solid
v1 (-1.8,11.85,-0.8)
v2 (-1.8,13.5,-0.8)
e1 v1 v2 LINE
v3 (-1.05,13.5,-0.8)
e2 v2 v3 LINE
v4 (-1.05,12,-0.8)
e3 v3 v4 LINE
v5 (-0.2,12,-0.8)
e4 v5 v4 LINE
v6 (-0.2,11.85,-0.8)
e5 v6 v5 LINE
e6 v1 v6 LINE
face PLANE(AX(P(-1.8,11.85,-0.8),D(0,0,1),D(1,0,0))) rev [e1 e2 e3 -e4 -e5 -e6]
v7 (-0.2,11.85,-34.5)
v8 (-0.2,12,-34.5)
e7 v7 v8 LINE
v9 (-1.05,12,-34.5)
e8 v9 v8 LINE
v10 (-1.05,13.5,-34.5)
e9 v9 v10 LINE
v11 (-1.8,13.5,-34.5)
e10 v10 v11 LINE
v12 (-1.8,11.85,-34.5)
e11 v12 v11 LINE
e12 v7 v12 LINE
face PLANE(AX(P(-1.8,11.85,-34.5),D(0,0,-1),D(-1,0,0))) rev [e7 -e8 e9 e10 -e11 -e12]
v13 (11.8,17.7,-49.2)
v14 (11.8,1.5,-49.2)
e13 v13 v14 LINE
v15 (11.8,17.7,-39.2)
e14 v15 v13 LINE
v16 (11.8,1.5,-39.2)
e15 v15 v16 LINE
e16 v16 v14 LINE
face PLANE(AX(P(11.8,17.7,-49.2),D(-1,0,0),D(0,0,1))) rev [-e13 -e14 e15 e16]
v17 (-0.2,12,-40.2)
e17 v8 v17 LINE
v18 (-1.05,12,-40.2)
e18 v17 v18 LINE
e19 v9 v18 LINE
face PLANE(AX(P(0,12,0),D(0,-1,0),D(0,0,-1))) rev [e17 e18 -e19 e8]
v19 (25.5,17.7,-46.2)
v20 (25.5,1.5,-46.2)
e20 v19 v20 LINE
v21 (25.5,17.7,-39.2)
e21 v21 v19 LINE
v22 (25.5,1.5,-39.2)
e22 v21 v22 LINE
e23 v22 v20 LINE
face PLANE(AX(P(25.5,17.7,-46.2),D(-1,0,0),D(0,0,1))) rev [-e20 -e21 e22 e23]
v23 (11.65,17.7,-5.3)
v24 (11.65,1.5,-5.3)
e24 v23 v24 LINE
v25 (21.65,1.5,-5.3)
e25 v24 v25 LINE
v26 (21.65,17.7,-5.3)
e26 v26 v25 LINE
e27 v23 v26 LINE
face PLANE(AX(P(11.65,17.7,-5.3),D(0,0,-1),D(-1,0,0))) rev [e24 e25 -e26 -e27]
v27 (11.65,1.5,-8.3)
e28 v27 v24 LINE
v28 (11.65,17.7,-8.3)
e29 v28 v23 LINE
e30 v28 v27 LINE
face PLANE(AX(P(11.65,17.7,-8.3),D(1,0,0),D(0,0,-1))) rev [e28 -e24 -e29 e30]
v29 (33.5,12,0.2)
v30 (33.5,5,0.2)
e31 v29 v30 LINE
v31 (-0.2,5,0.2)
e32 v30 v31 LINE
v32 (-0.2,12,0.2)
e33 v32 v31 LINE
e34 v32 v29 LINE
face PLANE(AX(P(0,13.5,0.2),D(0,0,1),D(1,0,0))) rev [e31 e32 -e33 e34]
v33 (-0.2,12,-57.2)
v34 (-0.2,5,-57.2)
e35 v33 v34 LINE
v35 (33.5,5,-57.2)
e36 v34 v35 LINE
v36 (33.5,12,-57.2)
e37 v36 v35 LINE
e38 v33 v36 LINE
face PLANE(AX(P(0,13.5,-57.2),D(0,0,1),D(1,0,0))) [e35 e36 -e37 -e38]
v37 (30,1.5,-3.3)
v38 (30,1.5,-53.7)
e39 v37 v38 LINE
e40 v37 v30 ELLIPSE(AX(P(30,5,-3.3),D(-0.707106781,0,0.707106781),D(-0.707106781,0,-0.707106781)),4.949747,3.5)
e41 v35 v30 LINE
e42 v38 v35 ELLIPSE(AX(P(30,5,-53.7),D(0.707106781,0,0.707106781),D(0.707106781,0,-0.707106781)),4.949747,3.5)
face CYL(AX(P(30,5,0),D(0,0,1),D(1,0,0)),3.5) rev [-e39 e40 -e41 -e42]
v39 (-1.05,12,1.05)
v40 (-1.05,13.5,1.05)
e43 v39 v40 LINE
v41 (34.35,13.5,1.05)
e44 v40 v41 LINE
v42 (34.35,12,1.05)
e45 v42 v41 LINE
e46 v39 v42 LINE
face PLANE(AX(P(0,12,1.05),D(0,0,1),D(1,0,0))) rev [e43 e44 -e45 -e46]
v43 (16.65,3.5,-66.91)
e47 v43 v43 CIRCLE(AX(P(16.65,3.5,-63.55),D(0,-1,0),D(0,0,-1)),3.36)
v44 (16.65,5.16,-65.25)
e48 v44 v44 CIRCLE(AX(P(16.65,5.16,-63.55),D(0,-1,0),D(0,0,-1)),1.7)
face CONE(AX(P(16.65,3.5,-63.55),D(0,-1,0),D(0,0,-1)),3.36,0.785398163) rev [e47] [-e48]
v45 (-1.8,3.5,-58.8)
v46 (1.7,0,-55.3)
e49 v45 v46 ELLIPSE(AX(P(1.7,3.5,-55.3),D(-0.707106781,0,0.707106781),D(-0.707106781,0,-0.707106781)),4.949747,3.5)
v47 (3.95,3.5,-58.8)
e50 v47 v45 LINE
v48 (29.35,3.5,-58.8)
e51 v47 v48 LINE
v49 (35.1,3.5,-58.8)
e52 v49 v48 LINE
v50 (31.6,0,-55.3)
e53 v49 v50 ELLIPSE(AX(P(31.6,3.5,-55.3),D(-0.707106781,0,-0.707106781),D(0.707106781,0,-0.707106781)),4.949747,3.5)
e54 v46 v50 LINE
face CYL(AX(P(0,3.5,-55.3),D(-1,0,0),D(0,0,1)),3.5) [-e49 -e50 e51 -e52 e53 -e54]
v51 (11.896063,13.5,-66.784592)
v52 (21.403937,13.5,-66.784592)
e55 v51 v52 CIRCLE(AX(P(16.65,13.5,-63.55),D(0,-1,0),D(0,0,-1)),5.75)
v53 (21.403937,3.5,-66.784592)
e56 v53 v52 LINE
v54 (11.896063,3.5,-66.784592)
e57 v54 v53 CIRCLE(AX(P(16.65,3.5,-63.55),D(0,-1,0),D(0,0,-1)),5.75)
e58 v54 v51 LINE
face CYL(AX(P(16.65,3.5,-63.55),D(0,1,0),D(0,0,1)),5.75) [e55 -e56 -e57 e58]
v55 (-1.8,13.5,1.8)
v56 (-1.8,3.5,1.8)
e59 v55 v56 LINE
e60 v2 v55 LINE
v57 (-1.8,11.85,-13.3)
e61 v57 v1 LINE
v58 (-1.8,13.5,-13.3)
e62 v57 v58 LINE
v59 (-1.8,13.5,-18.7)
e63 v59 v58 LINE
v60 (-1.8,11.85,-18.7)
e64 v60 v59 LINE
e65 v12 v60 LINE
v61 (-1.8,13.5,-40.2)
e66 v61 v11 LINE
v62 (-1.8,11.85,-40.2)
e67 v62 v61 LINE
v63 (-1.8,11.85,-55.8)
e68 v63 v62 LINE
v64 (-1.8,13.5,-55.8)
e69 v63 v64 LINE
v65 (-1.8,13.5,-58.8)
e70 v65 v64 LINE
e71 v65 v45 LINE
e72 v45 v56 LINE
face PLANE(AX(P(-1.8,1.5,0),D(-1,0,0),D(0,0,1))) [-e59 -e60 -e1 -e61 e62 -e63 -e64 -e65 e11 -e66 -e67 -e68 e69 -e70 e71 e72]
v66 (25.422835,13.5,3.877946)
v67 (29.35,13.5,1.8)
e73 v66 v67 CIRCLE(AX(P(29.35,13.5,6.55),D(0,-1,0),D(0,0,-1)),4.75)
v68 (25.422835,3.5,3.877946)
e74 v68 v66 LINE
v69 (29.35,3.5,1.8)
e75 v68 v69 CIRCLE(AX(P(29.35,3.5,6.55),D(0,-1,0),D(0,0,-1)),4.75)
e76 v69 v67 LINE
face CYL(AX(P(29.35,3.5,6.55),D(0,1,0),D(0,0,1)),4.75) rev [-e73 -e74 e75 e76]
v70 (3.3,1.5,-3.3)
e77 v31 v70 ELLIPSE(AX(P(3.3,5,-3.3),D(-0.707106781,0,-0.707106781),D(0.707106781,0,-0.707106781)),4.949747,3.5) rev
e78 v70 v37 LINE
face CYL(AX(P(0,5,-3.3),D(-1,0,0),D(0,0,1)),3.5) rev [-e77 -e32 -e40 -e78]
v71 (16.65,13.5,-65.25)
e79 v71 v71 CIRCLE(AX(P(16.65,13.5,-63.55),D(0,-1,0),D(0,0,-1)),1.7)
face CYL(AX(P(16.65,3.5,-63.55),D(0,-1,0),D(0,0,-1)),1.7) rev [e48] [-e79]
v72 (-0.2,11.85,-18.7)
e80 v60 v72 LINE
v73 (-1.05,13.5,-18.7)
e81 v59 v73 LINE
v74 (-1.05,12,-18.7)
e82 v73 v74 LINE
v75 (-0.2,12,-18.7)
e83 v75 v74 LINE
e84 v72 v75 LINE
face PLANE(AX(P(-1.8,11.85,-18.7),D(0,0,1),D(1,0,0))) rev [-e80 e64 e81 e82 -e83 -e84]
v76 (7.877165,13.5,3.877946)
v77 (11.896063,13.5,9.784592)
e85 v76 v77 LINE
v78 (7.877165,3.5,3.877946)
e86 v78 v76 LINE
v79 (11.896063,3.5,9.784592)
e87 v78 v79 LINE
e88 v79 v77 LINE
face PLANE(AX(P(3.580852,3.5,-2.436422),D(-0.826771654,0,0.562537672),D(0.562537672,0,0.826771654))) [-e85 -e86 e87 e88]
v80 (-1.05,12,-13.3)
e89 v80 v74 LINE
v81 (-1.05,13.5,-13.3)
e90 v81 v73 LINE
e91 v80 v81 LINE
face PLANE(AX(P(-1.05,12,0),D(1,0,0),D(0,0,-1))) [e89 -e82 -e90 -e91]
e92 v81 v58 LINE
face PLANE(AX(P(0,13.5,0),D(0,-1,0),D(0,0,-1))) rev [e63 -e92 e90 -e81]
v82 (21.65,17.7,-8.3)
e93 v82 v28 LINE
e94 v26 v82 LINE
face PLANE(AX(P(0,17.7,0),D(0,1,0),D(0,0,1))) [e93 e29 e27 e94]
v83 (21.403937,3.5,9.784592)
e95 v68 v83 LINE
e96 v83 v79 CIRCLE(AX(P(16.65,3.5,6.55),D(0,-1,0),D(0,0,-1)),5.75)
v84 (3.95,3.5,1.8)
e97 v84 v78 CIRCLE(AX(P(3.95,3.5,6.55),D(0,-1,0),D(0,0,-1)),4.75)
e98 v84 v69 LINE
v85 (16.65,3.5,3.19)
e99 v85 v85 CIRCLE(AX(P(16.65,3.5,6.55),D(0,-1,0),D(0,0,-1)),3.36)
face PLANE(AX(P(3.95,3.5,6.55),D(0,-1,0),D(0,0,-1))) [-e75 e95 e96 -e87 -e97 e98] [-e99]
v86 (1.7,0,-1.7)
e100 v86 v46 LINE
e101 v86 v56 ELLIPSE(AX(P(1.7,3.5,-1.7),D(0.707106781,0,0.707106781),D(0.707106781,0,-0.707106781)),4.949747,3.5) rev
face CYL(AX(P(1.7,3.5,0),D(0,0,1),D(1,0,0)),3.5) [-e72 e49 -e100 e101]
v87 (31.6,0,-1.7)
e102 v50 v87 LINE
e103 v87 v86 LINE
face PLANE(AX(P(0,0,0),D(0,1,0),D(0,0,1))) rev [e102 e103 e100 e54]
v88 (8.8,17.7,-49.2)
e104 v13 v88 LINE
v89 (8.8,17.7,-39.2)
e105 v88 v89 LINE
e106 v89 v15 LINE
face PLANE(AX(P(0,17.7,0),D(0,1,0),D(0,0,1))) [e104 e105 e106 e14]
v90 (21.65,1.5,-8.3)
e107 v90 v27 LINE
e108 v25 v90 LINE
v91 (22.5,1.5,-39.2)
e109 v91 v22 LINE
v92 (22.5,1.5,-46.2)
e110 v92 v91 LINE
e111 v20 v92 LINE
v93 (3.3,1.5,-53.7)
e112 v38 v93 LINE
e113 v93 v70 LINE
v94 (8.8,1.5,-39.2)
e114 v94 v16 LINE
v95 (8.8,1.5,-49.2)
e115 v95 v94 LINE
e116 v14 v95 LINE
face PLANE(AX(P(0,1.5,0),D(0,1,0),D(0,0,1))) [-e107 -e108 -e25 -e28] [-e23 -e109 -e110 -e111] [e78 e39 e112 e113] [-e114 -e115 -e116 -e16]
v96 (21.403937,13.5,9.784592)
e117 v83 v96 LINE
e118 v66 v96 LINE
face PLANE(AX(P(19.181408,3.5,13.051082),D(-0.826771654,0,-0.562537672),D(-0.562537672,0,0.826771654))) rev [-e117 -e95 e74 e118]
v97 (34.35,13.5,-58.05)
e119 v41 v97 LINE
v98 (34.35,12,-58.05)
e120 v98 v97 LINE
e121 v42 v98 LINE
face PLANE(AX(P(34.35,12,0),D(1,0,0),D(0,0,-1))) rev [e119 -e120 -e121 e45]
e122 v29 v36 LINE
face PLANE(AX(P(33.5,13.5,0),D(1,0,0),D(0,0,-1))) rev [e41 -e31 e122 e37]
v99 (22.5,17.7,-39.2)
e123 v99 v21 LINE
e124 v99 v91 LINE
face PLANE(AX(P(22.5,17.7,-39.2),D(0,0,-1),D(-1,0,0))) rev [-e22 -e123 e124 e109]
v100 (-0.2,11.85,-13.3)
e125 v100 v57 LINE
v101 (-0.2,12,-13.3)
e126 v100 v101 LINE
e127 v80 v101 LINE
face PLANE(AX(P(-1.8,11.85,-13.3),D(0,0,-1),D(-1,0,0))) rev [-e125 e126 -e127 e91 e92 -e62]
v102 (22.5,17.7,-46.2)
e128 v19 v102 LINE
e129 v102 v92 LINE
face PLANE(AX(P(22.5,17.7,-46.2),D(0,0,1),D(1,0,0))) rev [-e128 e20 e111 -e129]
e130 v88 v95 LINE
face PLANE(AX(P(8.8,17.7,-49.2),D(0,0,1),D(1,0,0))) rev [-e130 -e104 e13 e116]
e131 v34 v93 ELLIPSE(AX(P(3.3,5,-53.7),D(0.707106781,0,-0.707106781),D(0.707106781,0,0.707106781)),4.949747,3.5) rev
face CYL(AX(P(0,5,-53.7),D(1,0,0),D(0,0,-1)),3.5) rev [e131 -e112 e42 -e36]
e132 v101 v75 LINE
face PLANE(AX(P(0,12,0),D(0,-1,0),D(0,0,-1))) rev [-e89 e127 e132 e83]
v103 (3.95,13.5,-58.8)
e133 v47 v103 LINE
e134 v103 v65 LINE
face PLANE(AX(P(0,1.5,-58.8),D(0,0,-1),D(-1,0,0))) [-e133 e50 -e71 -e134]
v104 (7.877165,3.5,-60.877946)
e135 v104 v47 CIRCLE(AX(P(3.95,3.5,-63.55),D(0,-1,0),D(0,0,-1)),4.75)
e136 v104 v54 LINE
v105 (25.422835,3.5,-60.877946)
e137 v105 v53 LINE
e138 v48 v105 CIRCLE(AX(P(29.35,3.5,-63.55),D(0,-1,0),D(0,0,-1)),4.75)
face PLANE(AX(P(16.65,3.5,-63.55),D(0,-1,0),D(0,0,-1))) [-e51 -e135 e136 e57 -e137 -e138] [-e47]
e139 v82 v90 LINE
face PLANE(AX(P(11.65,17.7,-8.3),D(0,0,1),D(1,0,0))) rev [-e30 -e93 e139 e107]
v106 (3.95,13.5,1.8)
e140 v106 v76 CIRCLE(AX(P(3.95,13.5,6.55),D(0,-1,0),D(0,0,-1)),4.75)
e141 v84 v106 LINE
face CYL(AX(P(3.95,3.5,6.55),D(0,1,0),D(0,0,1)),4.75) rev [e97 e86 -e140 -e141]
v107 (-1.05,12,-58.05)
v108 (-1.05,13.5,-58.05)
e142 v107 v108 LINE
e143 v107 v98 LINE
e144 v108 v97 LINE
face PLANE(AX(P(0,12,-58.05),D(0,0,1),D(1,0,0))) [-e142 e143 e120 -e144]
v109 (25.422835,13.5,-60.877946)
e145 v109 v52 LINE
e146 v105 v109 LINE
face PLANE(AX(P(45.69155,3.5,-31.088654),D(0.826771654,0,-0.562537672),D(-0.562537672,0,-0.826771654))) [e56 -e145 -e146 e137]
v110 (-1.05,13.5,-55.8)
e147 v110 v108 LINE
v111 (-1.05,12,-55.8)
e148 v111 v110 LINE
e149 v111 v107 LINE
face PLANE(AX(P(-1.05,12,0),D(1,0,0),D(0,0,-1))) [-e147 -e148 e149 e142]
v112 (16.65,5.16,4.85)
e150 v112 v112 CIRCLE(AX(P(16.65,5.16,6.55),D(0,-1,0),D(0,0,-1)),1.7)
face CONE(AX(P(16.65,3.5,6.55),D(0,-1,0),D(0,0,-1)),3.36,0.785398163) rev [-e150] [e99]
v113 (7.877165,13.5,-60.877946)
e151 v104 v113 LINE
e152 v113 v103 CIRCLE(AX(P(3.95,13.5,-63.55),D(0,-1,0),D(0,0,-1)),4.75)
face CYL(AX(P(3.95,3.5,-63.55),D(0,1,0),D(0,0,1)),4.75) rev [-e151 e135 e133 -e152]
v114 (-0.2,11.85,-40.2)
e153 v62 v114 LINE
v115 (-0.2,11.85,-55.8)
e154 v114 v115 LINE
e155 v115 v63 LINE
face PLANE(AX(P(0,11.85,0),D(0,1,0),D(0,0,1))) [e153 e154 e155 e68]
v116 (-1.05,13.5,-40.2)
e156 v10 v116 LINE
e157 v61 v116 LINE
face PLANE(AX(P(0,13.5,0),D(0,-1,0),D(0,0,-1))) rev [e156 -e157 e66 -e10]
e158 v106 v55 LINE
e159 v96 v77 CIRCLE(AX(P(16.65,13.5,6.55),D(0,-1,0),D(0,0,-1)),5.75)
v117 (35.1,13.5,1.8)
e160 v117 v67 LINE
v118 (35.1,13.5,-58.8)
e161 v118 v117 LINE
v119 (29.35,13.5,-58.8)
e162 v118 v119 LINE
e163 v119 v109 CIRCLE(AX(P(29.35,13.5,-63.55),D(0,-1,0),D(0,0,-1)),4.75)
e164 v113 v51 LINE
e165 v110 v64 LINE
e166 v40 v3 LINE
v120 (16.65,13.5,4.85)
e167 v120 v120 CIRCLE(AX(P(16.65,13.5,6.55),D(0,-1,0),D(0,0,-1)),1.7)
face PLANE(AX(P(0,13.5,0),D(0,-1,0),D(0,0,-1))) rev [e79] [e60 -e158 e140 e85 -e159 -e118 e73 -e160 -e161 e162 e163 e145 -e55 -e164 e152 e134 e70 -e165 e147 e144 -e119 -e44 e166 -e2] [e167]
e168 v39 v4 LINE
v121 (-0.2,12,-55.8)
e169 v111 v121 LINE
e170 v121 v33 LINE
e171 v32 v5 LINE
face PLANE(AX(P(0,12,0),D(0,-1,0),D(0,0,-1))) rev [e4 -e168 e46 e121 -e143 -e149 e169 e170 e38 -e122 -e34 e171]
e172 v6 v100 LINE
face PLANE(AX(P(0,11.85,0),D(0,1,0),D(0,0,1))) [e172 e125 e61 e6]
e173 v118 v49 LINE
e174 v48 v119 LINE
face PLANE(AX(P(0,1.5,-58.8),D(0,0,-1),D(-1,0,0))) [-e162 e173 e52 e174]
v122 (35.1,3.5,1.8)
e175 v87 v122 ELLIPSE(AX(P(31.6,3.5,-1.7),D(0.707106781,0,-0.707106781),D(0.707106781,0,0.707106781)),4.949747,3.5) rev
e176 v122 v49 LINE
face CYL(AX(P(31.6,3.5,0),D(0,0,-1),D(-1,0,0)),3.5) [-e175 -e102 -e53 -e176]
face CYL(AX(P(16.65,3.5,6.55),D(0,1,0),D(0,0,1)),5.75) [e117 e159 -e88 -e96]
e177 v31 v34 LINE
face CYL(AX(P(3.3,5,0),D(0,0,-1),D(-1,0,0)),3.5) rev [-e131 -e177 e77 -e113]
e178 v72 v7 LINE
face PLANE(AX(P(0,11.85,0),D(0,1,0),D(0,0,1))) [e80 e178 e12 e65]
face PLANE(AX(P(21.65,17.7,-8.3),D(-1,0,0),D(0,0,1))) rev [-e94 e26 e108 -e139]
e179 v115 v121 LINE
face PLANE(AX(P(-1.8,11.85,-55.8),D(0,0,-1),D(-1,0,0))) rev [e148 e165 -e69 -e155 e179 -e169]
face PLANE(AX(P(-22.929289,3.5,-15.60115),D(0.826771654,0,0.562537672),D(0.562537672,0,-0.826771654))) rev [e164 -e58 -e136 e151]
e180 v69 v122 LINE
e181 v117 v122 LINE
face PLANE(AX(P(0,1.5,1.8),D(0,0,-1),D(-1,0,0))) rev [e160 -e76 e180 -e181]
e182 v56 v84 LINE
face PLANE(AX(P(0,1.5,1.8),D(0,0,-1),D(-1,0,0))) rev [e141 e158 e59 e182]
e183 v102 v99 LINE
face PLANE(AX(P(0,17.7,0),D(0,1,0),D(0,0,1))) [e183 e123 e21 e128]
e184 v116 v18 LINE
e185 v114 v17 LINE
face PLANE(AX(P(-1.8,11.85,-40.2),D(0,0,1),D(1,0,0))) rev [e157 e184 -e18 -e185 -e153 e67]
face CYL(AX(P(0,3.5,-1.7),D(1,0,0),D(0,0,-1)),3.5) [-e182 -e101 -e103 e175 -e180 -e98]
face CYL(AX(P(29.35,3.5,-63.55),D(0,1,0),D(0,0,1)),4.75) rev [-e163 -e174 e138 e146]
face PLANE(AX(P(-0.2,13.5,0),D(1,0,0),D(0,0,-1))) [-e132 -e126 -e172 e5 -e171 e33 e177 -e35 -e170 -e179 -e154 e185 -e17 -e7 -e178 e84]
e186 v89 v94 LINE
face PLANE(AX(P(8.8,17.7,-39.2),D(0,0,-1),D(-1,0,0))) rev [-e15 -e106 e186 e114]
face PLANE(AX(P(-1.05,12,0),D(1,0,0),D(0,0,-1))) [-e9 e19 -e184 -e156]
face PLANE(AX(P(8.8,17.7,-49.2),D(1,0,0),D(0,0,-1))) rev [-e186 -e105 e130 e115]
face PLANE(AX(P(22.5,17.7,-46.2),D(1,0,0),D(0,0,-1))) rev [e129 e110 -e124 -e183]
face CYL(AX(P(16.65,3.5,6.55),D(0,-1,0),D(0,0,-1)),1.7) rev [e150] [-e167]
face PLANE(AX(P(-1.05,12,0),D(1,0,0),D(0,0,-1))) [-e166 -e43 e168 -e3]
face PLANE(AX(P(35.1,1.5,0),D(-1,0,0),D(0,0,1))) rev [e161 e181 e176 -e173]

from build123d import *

# Parameters (mm, degrees)
SKETCH_2_W                  = 36.9
SKETCH_2_H                  = 60.6
SKETCH_2_W_2                = 33.7
SKETCH_2_H_2                = 57.4
SKETCH_2_W_3                = 35.4
SKETCH_2_H_3                = 59.1
SKETCH_2_R                  = 3.75
SKETCH_2_R_2                = 2.25
SKETCH_2_R_3                = 0.75
EXTRUDE_1_DEPTH             = 1.5
EXTRUDE_START               = 1.5
SKETCH_2_20_W               = 36.9
SKETCH_2_20_H               = 60.6
SKETCH_2_20_W_2             = 35.4
SKETCH_2_20_H_2             = 59.1
SKETCH_2_20_W_3             = 33.7
SKETCH_2_20_H_3             = 57.4
EXTRUDE_9_DEPTH             = 12
CUT_EXTRUDE_START           = 13.5
SKETCH_2_21_W               = 35.4
SKETCH_2_21_H               = 59.1
SKETCH_2_21_W_2             = 33.7
SKETCH_2_21_H_2             = 57.4
CUT_EXTRUDE_3_DEPTH         = 1.5
EXTRUDE_START_2             = 13.5
SKETCH_2_23_R               = 3
SKETCH_2_23_R_2             = 1.6
EXTRUDE_10_DEPTH            = 10
FILLET_2_R                  = 3.5
HOLE_WIZARD_M32_D           = 3.4
HOLE_WIZARD_M32_CSINK_D     = 6.72
HOLE_WIZARD_M32_CSINK_ANGLE = 90
SKETCH_12_W                 = 1.6
SKETCH_12_H                 = 15.6
SKETCH_12_H_2               = 15.8
SKETCH_12_H_3               = 12.5
CUT_EXTRUDE_4_DEPTH         = 1.65
SKETCH_13_W                 = 3
SKETCH_13_H                 = 10
SKETCH_13_H_2               = 7
SKETCH_13_W_2               = 10
SKETCH_13_H_3               = 3
EXTRUDE_11_DEPTH            = 16.2


with BuildPart() as part:
    # Эскиз2 → Бобышка-Вытянуть1 (new body)
    # profile 1 of 15: a face of its own
    with BuildSketch(Plane(origin=(0, 0, 0), x_dir=(1, 0, 0), z_dir=(0, 1, 0))):
        with Locations((16.65, 28.5)):
            Rectangle(SKETCH_2_W, SKETCH_2_H)
        with Locations((16.65, 28.5)):
            Rectangle(SKETCH_2_W_2, SKETCH_2_H_2, mode=Mode.SUBTRACT)
    # profile 2 of 15: a face of its own
    with BuildSketch(Plane(origin=(0, 0, 0), x_dir=(1, 0, 0), z_dir=(0, 1, 0))):
        with Locations((16.65, 28.5)):
            Rectangle(SKETCH_2_W_3, SKETCH_2_H_3)
        with Locations((16.65, 28.5)):
            Rectangle(SKETCH_2_W_2, SKETCH_2_H_2, mode=Mode.SUBTRACT)
    # profile 3 of 15: a face of its own
    with BuildSketch(Plane(origin=(0, 0, 0), x_dir=(1, 0, 0), z_dir=(0, 1, 0))):
        with BuildLine():
            Line((-0.2, 57.2), (-0.2, -0.2))
            Line((-0.2, -0.2), (33.5, -0.2))
            Line((33.5, -0.2), (33.5, 10.050490243))
            ThreePointArc((33.5, 10.050490243), (27, 12.6), (33.5, 15.149509757))
            Line((33.5, 15.149509757), (33.5, 57.2))
            Line((33.5, 57.2), (-0.2, 57.2))
        make_face()
        with Locations((5.1, 19.73)):
            Circle(SKETCH_2_R, mode=Mode.SUBTRACT)
        with Locations((5.1, 41.13)):
            Circle(SKETCH_2_R, mode=Mode.SUBTRACT)
        with Locations((23.55, 45)):
            Circle(SKETCH_2_R, mode=Mode.SUBTRACT)
    # profile 4 of 15: a face of its own
    with BuildSketch(Plane(origin=(0, 0, 0), x_dir=(1, 0, 0), z_dir=(0, 1, 0))):
        with Locations((23.55, 45)):
            Circle(SKETCH_2_R)
        with Locations((23.55, 45)):
            Circle(SKETCH_2_R_2, mode=Mode.SUBTRACT)
    # profile 5 of 15: a face of its own
    with BuildSketch(Plane(origin=(0, 0, 0), x_dir=(1, 0, 0), z_dir=(0, 1, 0))):
        with Locations((23.55, 45)):
            Circle(SKETCH_2_R_2)
        with Locations((23.55, 45)):
            Circle(SKETCH_2_R_3, mode=Mode.SUBTRACT)
    # profile 6 of 15: a face of its own
    with BuildSketch(Plane(origin=(0, 0, 0), x_dir=(1, 0, 0), z_dir=(0, 1, 0))):
        with Locations((23.55, 45)):
            Circle(SKETCH_2_R_3)
    # profile 7 of 15: a face of its own
    with BuildSketch(Plane(origin=(0, 0, 0), x_dir=(1, 0, 0), z_dir=(0, 1, 0))):
        with Locations((5.1, 41.13)):
            Circle(SKETCH_2_R)
        with Locations((5.1, 41.13)):
            Circle(SKETCH_2_R_2, mode=Mode.SUBTRACT)
    # profile 8 of 15: a face of its own
    with BuildSketch(Plane(origin=(0, 0, 0), x_dir=(1, 0, 0), z_dir=(0, 1, 0))):
        with Locations((5.1, 41.13)):
            Circle(SKETCH_2_R_2)
        with Locations((5.1, 41.13)):
            Circle(SKETCH_2_R_3, mode=Mode.SUBTRACT)
    # profile 9 of 15: a face of its own
    with BuildSketch(Plane(origin=(0, 0, 0), x_dir=(1, 0, 0), z_dir=(0, 1, 0))):
        with Locations((5.1, 41.13)):
            Circle(SKETCH_2_R_3)
    # profile 10 of 15: a face of its own
    with BuildSketch(Plane(origin=(0, 0, 0), x_dir=(1, 0, 0), z_dir=(0, 1, 0))):
        with Locations((5.1, 19.73)):
            Circle(SKETCH_2_R)
        with Locations((5.1, 19.73)):
            Circle(SKETCH_2_R_2, mode=Mode.SUBTRACT)
    # profile 11 of 15: a face of its own
    with BuildSketch(Plane(origin=(0, 0, 0), x_dir=(1, 0, 0), z_dir=(0, 1, 0))):
        with Locations((5.1, 19.73)):
            Circle(SKETCH_2_R_2)
        with Locations((5.1, 19.73)):
            Circle(SKETCH_2_R_3, mode=Mode.SUBTRACT)
    # profile 12 of 15: a face of its own
    with BuildSketch(Plane(origin=(0, 0, 0), x_dir=(1, 0, 0), z_dir=(0, 1, 0))):
        with Locations((5.1, 19.73)):
            Circle(SKETCH_2_R_3)
    # profile 13 of 15: a face of its own
    with BuildSketch(Plane(origin=(0, 0, 0), x_dir=(1, 0, 0), z_dir=(0, 1, 0))):
        with BuildLine():
            ThreePointArc((33.5, 15.149509757), (27, 12.6), (33.5, 10.050490243))
            Line((33.5, 10.050490243), (33.5, 15.149509757))
        make_face()
        with Locations((30.75, 12.6)):
            Circle(SKETCH_2_R_2, mode=Mode.SUBTRACT)
    # profile 14 of 15: a face of its own
    with BuildSketch(Plane(origin=(0, 0, 0), x_dir=(1, 0, 0), z_dir=(0, 1, 0))):
        with Locations((30.75, 12.6)):
            Circle(SKETCH_2_R_2)
        with Locations((30.75, 12.6)):
            Circle(SKETCH_2_R_3, mode=Mode.SUBTRACT)
    # profile 15 of 15: a face of its own
    with BuildSketch(Plane(origin=(0, 0, 0), x_dir=(1, 0, 0), z_dir=(0, 1, 0))):
        with Locations((30.75, 12.6)):
            Circle(SKETCH_2_R_3)
    extrude(amount=EXTRUDE_1_DEPTH)

    # Эскиз2<20> → Бобышка-Вытянуть9 (add)
    # profile 1 of 2: a face of its own
    with BuildSketch(Plane(origin=(0, 0, 0), x_dir=(1, 0, 0), z_dir=(0, 1, 0)).offset(EXTRUDE_START)):
        with Locations((16.65, 28.5)):
            Rectangle(SKETCH_2_20_W, SKETCH_2_20_H)
        with Locations((16.65, 28.5)):
            Rectangle(SKETCH_2_20_W_2, SKETCH_2_20_H_2, mode=Mode.SUBTRACT)
    # profile 2 of 2: a face of its own
    with BuildSketch(Plane(origin=(0, 0, 0), x_dir=(1, 0, 0), z_dir=(0, 1, 0)).offset(EXTRUDE_START)):
        with Locations((16.65, 28.5)):
            Rectangle(SKETCH_2_20_W_2, SKETCH_2_20_H_2)
        with Locations((16.65, 28.5)):
            Rectangle(SKETCH_2_20_W_3, SKETCH_2_20_H_3, mode=Mode.SUBTRACT)
    extrude(amount=EXTRUDE_9_DEPTH)

    # Эскиз2<21> → Вырез-Вытянуть3 (cut)
    with BuildSketch(Plane(origin=(0, 0, 0), x_dir=(1, 0, 0), z_dir=(0, 1, 0)).offset(CUT_EXTRUDE_START)):
        with Locations((16.65, 28.5)):
            Rectangle(SKETCH_2_21_W, SKETCH_2_21_H)
        with Locations((16.65, 28.5)):
            Rectangle(SKETCH_2_21_W_2, SKETCH_2_21_H_2, mode=Mode.SUBTRACT)
    extrude(amount=-CUT_EXTRUDE_3_DEPTH, mode=Mode.SUBTRACT)

    # Эскиз2<23> → Бобышка-Вытянуть10 (add)
    # profile 1 of 4: a face of its own
    with BuildSketch(Plane(origin=(0, 0, 0), x_dir=(1, 0, 0), z_dir=(0, 1, 0)).offset(EXTRUDE_START_2)):
        with BuildLine():
            ThreePointArc((7.877165354, 60.877946056), (6.171513422, 59.351502874), (3.95, 58.8))
            Line((3.95, 58.8), (29.35, 58.8))
            ThreePointArc((29.35, 58.8), (27.128486578, 59.351502874), (25.422834646, 60.877946056))
            Line((25.422834646, 60.877946056), (21.403937008, 66.784591616))
            ThreePointArc((21.403937008, 66.784591616), (19.339200458, 68.632391258), (16.65, 69.3))
            ThreePointArc((16.65, 69.3), (13.960799542, 68.632391258), (11.896062992, 66.784591616))
            Line((11.896062992, 66.784591616), (7.877165354, 60.877946056))
        make_face()
        with Locations((16.65, 63.55)):
            Circle(SKETCH_2_23_R, mode=Mode.SUBTRACT)
    # profile 2 of 4: a face of its own
    with BuildSketch(Plane(origin=(0, 0, 0), x_dir=(1, 0, 0), z_dir=(0, 1, 0)).offset(EXTRUDE_START_2)):
        with Locations((16.65, 63.55)):
            Circle(SKETCH_2_23_R)
        with Locations(Location((16.65, 63.55, 0), (0, 0, 90))):
            Circle(SKETCH_2_23_R_2, mode=Mode.SUBTRACT)
    # profile 3 of 4: a face of its own
    with BuildSketch(Plane(origin=(0, 0, 0), x_dir=(1, 0, 0), z_dir=(0, 1, 0)).offset(EXTRUDE_START_2)):
        with BuildLine():
            Line((29.35, -1.8), (3.95, -1.8))
            ThreePointArc((3.95, -1.8), (6.171513422, -2.351502874), (7.877165354, -3.877946056))
            Line((7.877165354, -3.877946056), (11.896062992, -9.784591616))
            ThreePointArc((11.896062992, -9.784591616), (13.960799542, -11.632391258), (16.65, -12.3))
            ThreePointArc((16.65, -12.3), (19.339200458, -11.632391258), (21.403937008, -9.784591616))
            Line((21.403937008, -9.784591616), (25.422834646, -3.877946056))
            ThreePointArc((25.422834646, -3.877946056), (27.128486578, -2.351502874), (29.35, -1.8))
        make_face()
        with Locations((16.65, -6.55)):
            Circle(SKETCH_2_23_R, mode=Mode.SUBTRACT)
    # profile 4 of 4: a face of its own
    with BuildSketch(Plane(origin=(0, 0, 0), x_dir=(1, 0, 0), z_dir=(0, 1, 0)).offset(EXTRUDE_START_2)):
        with Locations((16.65, -6.55)):
            Circle(SKETCH_2_23_R)
        with Locations(Location((16.65, -6.55, 0), (0, 0, 90))):
            Circle(SKETCH_2_23_R_2, mode=Mode.SUBTRACT)
    extrude(amount=-EXTRUDE_10_DEPTH)

    # Скругление2
    fillet_2_edges = [part.edges().sort_by_distance(p)[0] for p in [
        (16.65, 1.5, -57.2),
        (-0.2, 1.5, -28.5),
        (33.5, 1.5, -28.5),
        (16.65, 1.5, 0.2),
        (16.65, 0, -58.8),
        (35.1, 0, -28.5),
        (16.65, 0, 1.8),
        (-1.8, 0, -28.5),
    ]]
    fillet(fillet_2_edges, radius=FILLET_2_R - 0.0001)  # a hair under: the kernel refuses the full size

    # Зенковка для  винта с потайной головкой с внутренним шестигранником M32 (through all)
    with Locations(Plane(origin=(0, 3.5, 0), x_dir=(-1, 0, 0), z_dir=(0, -1, 0))):
        with Locations((-16.65, 63.55), (-16.65, -6.55)):
            CounterSinkHole(HOLE_WIZARD_M32_D / 2, HOLE_WIZARD_M32_CSINK_D / 2, counter_sink_angle=HOLE_WIZARD_M32_CSINK_ANGLE)

    # Эскиз12 → Вырез-Вытянуть4 (cut)
    with BuildSketch(Plane(origin=(0, 13.5, 0), x_dir=(1, 0, 0), z_dir=(0, 1, 0))):
        with Locations((-1, 48)):
            Rectangle(SKETCH_12_W, SKETCH_12_H)
        with Locations((-1, 26.6)):
            Rectangle(SKETCH_12_W, SKETCH_12_H_2)
        with Locations((-1, 7.05)):
            Rectangle(SKETCH_12_W, SKETCH_12_H_3)
    extrude(amount=-CUT_EXTRUDE_4_DEPTH, mode=Mode.SUBTRACT)

    # Эскиз13 → Бобышка-Вытянуть11 (add)
    with BuildSketch(Plane(origin=(0, 1.5, 0), x_dir=(1, 0, 0), z_dir=(0, 1, 0))):
        with Locations((10.3, 44.2)):
            Rectangle(SKETCH_13_W, SKETCH_13_H)
        with Locations((24, 42.7)):
            Rectangle(SKETCH_13_W, SKETCH_13_H_2)
        with Locations((16.65, 6.8)):
            Rectangle(SKETCH_13_W_2, SKETCH_13_H_3)
    extrude(amount=EXTRUDE_11_DEPTH)


solid = part.part
